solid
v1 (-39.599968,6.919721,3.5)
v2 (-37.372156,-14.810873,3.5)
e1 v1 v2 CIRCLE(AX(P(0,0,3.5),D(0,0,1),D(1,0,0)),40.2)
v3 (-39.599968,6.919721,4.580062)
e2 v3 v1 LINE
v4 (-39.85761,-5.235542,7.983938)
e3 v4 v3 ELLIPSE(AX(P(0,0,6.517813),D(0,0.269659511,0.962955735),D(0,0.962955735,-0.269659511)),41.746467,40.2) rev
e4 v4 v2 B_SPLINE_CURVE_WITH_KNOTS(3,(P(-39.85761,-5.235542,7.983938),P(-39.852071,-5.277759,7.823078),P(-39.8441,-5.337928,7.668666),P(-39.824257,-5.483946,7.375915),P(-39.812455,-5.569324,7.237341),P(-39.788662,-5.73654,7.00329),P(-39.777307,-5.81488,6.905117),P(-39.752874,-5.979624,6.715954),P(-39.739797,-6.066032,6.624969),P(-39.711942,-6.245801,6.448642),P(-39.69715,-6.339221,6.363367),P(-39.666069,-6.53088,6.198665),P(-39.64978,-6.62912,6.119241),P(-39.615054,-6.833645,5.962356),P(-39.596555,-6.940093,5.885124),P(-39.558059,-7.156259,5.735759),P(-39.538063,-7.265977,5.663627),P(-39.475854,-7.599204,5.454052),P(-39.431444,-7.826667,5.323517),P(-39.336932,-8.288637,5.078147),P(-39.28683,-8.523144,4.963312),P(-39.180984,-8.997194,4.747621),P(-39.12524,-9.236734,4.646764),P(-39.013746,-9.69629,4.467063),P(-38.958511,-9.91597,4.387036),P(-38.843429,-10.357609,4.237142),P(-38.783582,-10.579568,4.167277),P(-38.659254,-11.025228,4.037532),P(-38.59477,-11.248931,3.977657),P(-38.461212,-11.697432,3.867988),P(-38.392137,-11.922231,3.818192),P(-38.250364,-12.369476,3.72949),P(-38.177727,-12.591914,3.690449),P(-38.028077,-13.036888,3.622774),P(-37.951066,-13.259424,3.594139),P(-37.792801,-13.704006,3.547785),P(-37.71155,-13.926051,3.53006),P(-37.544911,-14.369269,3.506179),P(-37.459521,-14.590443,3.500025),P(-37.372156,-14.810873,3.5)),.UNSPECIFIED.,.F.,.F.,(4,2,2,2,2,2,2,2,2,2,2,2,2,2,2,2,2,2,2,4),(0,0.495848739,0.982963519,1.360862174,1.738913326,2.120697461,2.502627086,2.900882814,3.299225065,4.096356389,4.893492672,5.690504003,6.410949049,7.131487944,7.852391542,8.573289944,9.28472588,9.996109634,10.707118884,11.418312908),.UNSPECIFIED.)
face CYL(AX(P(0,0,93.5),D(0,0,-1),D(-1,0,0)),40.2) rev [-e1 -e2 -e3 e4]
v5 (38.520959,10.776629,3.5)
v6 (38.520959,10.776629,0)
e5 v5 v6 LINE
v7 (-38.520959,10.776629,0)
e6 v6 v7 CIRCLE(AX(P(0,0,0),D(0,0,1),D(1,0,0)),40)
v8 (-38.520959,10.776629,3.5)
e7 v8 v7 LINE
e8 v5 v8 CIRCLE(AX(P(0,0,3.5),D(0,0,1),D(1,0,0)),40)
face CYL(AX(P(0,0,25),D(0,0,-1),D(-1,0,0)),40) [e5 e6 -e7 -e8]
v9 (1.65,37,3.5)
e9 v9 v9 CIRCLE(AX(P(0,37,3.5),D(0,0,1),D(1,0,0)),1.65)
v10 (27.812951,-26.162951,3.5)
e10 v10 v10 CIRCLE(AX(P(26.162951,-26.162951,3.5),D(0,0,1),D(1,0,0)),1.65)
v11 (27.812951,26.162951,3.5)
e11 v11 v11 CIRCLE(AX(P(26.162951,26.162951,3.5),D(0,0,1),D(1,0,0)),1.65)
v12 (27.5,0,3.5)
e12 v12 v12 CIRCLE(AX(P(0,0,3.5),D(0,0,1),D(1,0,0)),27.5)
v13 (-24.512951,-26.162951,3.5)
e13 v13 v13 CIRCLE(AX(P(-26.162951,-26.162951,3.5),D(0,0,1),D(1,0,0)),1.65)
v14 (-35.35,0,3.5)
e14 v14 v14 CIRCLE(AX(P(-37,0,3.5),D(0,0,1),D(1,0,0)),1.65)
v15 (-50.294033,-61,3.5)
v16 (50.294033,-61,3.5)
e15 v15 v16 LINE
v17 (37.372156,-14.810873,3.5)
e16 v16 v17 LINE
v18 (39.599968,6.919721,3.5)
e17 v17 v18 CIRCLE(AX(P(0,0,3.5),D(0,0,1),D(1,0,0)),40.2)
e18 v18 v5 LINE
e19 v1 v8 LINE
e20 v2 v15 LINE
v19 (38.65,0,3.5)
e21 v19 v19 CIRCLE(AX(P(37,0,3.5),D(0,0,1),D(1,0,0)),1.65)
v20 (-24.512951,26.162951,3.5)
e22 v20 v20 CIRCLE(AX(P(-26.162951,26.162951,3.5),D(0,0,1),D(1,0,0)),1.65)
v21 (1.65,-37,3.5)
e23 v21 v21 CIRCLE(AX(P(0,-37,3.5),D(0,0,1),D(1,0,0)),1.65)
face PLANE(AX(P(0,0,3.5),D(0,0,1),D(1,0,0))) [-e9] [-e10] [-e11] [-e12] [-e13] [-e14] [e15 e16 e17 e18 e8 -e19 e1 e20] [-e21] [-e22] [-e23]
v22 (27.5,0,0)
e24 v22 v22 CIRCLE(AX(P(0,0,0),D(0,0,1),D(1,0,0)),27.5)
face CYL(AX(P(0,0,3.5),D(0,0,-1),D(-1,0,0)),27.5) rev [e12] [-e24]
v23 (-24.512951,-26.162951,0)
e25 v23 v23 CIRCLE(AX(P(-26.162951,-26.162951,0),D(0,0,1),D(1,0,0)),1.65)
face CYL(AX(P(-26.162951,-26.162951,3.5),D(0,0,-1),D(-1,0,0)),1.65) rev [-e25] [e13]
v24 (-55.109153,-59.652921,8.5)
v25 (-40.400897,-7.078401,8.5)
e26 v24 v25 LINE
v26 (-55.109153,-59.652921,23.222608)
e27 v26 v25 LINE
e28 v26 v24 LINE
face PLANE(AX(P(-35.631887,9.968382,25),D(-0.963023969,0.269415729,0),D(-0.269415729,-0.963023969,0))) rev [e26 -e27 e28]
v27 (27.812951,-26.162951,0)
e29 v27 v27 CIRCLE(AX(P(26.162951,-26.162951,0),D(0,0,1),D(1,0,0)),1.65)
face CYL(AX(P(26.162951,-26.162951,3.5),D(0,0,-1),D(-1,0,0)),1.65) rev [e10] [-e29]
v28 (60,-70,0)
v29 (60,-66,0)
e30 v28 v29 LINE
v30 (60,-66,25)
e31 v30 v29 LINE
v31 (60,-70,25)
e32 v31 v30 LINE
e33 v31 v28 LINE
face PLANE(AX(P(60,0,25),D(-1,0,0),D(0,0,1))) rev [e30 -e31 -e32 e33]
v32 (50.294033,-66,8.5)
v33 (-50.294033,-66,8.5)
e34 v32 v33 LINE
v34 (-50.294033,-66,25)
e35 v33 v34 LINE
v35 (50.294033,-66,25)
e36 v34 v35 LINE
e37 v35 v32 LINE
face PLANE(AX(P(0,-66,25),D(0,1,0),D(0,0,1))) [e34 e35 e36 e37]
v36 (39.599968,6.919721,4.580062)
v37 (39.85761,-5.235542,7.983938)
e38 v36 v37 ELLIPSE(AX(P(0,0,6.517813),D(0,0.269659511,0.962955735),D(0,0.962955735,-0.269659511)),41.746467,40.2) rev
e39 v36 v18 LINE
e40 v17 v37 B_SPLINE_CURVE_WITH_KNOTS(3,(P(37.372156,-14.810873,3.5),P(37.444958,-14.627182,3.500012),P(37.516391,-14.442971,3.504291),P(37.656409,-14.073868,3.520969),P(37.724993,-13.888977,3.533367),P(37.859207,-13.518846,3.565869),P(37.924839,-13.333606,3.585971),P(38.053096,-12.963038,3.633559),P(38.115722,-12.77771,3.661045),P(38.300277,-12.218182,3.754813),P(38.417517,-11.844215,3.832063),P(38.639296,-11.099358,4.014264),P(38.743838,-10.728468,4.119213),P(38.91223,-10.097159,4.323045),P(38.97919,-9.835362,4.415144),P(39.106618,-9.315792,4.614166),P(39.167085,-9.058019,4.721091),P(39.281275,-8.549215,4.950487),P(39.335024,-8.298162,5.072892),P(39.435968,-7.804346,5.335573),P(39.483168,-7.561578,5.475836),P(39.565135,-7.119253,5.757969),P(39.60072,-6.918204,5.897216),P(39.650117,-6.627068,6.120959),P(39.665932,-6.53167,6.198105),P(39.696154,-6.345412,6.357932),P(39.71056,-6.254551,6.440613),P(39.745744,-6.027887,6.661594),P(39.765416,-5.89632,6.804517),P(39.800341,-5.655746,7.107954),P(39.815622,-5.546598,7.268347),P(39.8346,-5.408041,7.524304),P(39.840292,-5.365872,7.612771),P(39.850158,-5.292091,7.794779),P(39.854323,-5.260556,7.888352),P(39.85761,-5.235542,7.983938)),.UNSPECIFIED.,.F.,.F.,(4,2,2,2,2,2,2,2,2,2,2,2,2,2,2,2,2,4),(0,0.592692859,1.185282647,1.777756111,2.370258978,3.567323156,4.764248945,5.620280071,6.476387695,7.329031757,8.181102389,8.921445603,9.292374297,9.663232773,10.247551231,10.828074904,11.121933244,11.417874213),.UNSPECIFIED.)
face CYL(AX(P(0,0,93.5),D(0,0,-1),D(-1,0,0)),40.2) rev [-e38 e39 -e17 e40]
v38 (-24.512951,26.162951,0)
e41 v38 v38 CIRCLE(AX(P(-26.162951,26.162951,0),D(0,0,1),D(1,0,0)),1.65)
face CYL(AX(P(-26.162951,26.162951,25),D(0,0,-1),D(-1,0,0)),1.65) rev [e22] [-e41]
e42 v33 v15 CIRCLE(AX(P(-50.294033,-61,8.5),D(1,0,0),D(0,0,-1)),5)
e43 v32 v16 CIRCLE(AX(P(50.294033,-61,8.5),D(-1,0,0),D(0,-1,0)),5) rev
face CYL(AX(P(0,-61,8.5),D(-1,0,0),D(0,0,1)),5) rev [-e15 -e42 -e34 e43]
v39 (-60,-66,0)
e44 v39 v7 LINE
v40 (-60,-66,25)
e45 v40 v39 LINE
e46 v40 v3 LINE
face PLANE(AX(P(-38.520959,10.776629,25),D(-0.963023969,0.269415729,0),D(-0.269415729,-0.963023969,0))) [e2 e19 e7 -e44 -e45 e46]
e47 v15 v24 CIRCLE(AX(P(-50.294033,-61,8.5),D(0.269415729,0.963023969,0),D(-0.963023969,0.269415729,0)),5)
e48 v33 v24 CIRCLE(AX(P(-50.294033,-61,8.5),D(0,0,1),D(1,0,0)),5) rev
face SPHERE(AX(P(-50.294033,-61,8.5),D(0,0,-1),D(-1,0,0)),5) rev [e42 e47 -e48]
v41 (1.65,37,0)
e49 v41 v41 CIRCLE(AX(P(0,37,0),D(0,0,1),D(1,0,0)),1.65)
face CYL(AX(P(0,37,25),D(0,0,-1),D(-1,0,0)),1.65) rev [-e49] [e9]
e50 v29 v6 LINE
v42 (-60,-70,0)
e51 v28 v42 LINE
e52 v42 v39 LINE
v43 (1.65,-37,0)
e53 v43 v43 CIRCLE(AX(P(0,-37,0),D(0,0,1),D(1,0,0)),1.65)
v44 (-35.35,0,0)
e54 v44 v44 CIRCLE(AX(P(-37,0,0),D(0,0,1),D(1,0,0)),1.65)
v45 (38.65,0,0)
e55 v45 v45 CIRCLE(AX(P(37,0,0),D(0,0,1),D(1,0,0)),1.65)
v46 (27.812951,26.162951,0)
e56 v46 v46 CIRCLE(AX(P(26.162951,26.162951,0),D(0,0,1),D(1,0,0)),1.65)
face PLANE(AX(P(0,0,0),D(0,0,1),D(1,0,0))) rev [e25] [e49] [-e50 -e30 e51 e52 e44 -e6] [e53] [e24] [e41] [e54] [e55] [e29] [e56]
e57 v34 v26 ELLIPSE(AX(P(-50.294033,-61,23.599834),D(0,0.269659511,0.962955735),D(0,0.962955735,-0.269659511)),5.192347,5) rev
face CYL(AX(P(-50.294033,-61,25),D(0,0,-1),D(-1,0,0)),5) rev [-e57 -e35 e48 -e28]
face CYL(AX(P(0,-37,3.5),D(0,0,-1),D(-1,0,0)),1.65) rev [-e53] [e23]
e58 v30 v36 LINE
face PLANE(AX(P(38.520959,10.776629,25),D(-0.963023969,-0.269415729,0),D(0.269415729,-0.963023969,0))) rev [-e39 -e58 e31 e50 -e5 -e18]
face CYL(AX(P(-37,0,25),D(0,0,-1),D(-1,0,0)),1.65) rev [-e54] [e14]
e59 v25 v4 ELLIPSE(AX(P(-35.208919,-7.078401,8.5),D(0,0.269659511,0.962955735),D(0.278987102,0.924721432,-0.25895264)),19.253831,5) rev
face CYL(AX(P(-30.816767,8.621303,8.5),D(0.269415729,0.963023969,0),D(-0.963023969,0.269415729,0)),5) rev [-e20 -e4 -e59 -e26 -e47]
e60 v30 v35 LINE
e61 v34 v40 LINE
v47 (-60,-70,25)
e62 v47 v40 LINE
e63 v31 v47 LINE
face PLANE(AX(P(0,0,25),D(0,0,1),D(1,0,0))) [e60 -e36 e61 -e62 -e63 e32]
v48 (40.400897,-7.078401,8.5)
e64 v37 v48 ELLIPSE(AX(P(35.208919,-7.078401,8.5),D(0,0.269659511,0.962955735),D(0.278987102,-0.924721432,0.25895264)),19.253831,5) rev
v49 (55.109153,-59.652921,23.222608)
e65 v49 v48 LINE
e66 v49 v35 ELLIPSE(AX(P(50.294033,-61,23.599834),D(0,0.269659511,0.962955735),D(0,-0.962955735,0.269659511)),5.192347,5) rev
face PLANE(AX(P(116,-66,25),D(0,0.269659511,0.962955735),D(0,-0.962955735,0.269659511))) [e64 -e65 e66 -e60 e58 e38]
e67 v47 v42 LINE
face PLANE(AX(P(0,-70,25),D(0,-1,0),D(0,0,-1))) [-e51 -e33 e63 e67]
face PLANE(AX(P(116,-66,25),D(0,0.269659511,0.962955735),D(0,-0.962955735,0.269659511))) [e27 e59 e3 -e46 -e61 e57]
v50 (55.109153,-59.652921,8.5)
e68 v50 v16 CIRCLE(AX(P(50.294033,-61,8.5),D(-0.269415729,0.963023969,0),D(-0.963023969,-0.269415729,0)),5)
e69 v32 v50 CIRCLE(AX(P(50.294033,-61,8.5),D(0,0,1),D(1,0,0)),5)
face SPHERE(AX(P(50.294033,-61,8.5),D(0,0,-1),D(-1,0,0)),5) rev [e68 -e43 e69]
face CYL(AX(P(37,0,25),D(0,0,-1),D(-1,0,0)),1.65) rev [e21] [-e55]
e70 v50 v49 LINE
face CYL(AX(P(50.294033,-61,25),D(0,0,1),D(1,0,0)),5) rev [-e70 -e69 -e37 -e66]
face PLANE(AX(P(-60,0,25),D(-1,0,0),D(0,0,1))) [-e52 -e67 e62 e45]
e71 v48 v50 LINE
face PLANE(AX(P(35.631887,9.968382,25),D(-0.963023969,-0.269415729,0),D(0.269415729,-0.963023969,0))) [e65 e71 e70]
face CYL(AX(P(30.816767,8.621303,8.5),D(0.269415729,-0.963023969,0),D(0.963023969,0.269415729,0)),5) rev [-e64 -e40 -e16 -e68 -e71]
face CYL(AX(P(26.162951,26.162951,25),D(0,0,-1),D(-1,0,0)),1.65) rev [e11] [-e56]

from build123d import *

# Parameters (mm, degrees)
EXTRUDE_3_DEPTH          = 25
SKETCH_1_5_R             = 1.65
SKETCH_1_5_R_2           = 27.5
EXTRUDE_4_DEPTH          = 3.5
CUT_EXTRUDE_1_DEPTH      = 116
CUT_EXTRUDE_1_DEPTH_BACK = 90
SKETCH_3_R               = 40.2
CUT_EXTRUDE_2_DEPTH      = 90
FILLET_1_R               = 5


with BuildPart() as part:
    # 草图1 → 凸台-拉伸3 (new body)
    with BuildSketch(Plane.XY):
        with BuildLine():
            Line((56.884812739, -66), (60, -66))
            Line((60, -66), (38.520958758, 10.776629174))
            ThreePointArc((38.520958758, 10.776629174), (0, 40), (-38.520958758, 10.776629174))
            Line((-38.520958758, 10.776629174), (-60, -66))
            Line((-60, -66), (-56.884812739, -66))
            Line((-56.884812739, -66), (-38.56602674, -0.519673214))
            ThreePointArc((-38.56602674, -0.519673214), (-38.588989549, 0.444535953), (-38.069024769, 1.256855618))
            Line((-38.069024769, 1.256855618), (-35.631886851, 9.968381986))
            ThreePointArc((-35.631886851, 9.968381986), (-32.349305917, 17.958908839), (-27.303372186, 24.970499941))
            ThreePointArc((-27.303372186, 24.970499941), (-27.329677093, 27.329677093), (-24.970499941, 27.303372186))
            ThreePointArc((-24.970499941, 27.303372186), (-14.159286998, 34.183542703), (-1.649589784, 36.963209459))
            ThreePointArc((-1.649589784, 36.963209459), (-0.018396414, 38.649897443), (1.65, 37))
            ThreePointArc((1.65, 37), (1.649897443, 36.981603586), (1.649589784, 36.963209459))
            ThreePointArc((1.649589784, 36.963209459), (14.159286998, 34.183542703), (24.970499941, 27.303372186))
            ThreePointArc((24.970499941, 27.303372186), (26.77734325, 27.694297385), (27.812950904, 26.162950904))
            ThreePointArc((27.812950904, 26.162950904), (27.680217379, 25.514566417), (27.303372186, 24.970499941))
            ThreePointArc((27.303372186, 24.970499941), (32.349305917, 17.958908839), (35.631886851, 9.968381986))
            Line((35.631886851, 9.968381986), (38.069024769, 1.256855618))
            ThreePointArc((38.069024769, 1.256855618), (38.497730094, 0.692318255), (38.65, 0))
            ThreePointArc((38.65, 0), (38.628871407, -0.263207028), (38.56602674, -0.519673214))
            Line((38.56602674, -0.519673214), (56.884812739, -66))
        make_face()
        Polygon((-60, -70), (-60, -66), (60, -66), (60, -70), (0, -70), align=None)
    extrude(amount=EXTRUDE_3_DEPTH)

    # 草图1<5> → 凸台-拉伸4 (add)
    with BuildSketch(Plane.XY):
        with BuildLine():
            Line((-56.884812739, -66), (56.884812739, -66))
            Line((56.884812739, -66), (38.56602674, -0.519673214))
            ThreePointArc((38.56602674, -0.519673214), (35.411010451, -0.444535953), (38.069024769, 1.256855618))
            Line((38.069024769, 1.256855618), (35.631886851, 9.968381986))
            ThreePointArc((35.631886851, 9.968381986), (32.349305917, 17.958908839), (27.303372186, 24.970499941))
            ThreePointArc((27.303372186, 24.970499941), (24.996224715, 24.996224715), (24.970499941, 27.303372186))
            ThreePointArc((24.970499941, 27.303372186), (14.159286998, 34.183542703), (1.649589784, 36.963209459))
            ThreePointArc((1.649589784, 36.963209459), (0, 35.35), (-1.649589784, 36.963209459))
            ThreePointArc((-1.649589784, 36.963209459), (-14.159286998, 34.183542703), (-24.970499941, 27.303372186))
            ThreePointArc((-24.970499941, 27.303372186), (-24.631604423, 26.77734325), (-24.512950904, 26.162950904))
            ThreePointArc((-24.512950904, 26.162950904), (-25.514566417, 24.645684428), (-27.303372186, 24.970499941))
            ThreePointArc((-27.303372186, 24.970499941), (-32.349305917, 17.958908839), (-35.631886851, 9.968381986))
            Line((-35.631886851, 9.968381986), (-38.069024769, 1.256855618))
            ThreePointArc((-38.069024769, 1.256855618), (-36.307681745, 1.497730094), (-35.35, 0))
            ThreePointArc((-35.35, 0), (-36.736792972, -1.628871407), (-38.56602674, -0.519673214))
            Line((-38.56602674, -0.519673214), (-56.884812739, -66))
        make_face()
        with Locations((0, -37)):
            Circle(SKETCH_1_5_R, mode=Mode.SUBTRACT)
        with Locations((-26.162950904, -26.162950904)):
            Circle(SKETCH_1_5_R, mode=Mode.SUBTRACT)
        with Locations((26.162950904, -26.162950904)):
            Circle(SKETCH_1_5_R, mode=Mode.SUBTRACT)
        Circle(SKETCH_1_5_R_2, mode=Mode.SUBTRACT)
    extrude(amount=EXTRUDE_4_DEPTH)

    # 草图2 → 切除-拉伸1 (cut, two sides: drawn at the far end of the back side and taken through both)
    with BuildSketch(Plane(origin=(0, 0, 0), x_dir=(0, 0, -1), z_dir=(1, 0, 0)).offset(-CUT_EXTRUDE_1_DEPTH_BACK)):
        Polygon((-25, -66), (-3.5, 10.776629174), (-3.5, 62.872025622), (-39.293867153, 54.574713181), (-52.271714816, -41.589010491), align=None)
    extrude(amount=CUT_EXTRUDE_1_DEPTH + CUT_EXTRUDE_1_DEPTH_BACK, mode=Mode.SUBTRACT)

    # 草图3 → 切除-拉伸2 (cut)
    with BuildSketch(Plane.XY.offset(3.5)):
        Circle(SKETCH_3_R)
    extrude(amount=CUT_EXTRUDE_2_DEPTH, mode=Mode.SUBTRACT)

    # 圆角1
    # the kernel refuses this fillet: 5 mm, written as the material it adds along each edge
    with BuildSketch(Plane(origin=(-50.294033224, -61, 8.5), x_dir=(0, -1, 0), z_dir=(0, 0, -1))) as fillet_1_piece_1_section:
        Polygon((0, 0), (FILLET_1_R, 0), (FILLET_1_R, FILLET_1_R * 1.31815590294), (-FILLET_1_R * 0.269415729351, FILLET_1_R * 0.963023968953), align=None)
    fillet_1_piece_1 = extrude(amount=FILLET_1_R, mode=Mode.PRIVATE)
    fillet_1_piece_1 = fillet_1_piece_1 - Plane(origin=(-50.294033224, -61, 8.5), x_dir=(0.7966855494331734, 0.6043940232367977, 0), z_dir=(0, 0, -1)) * Sphere(FILLET_1_R, mode=Mode.PRIVATE)
    add(fillet_1_piece_1)
    with BuildSketch(Plane(origin=(50.294033224, -61, 8.5), x_dir=(0.9630239689530686, 0.26941572935127434, 0), z_dir=(0, 0, -1))) as fillet_1_piece_2_section:
        Polygon((0, 0), (FILLET_1_R, 0), (FILLET_1_R, FILLET_1_R * 1.31815590294), (-FILLET_1_R * 0.269415729351, FILLET_1_R * 0.963023968953), align=None)
    fillet_1_piece_2 = extrude(amount=FILLET_1_R, mode=Mode.PRIVATE)
    fillet_1_piece_2 = fillet_1_piece_2 - Plane(origin=(50.294033224, -61, 8.5), x_dir=(-0.7966855494331732, 0.6043940232367977, 0), z_dir=(0, 0, -1)) * Sphere(FILLET_1_R, mode=Mode.PRIVATE)
    add(fillet_1_piece_2)
    with BuildSketch(Plane(origin=(-56.884812739, -66, 8.5), x_dir=(1, 0, 0), z_dir=(0, 0, 1))) as fillet_1_piece_3_section:
        with BuildLine():
            CenterArc((FILLET_1_R * 1.31815590294, FILLET_1_R), FILLET_1_R, 164.370497689, 105.629502311)
            Line((FILLET_1_R * 0.35513193399, FILLET_1_R * 1.26941572935), (0, 0))
            Line((0, 0), (FILLET_1_R * 1.31815590294, 0))
        make_face()
    fillet_1_piece_3 = extrude(amount=16.5, mode=Mode.PRIVATE)
    fillet_1_piece_3 = split(fillet_1_piece_3, bisect_by=Plane(origin=(-54.909873659, -62.45182584, 24.006393674), z_dir=(0, -0.26965951135538185, -0.9629557351901368)), keep=Keep.TOP, mode=Mode.PRIVATE)
    add(fillet_1_piece_3)
    with BuildSketch(Plane(origin=(56.884812739, -66, 8.5), x_dir=(-0.26941572935127367, 0.963023968953069, 0), z_dir=(0, 0, 1))) as fillet_1_piece_4_section:
        with BuildLine():
            CenterArc((FILLET_1_R * 1.31815590294, FILLET_1_R), FILLET_1_R, 164.370497689, 105.629502311)
            Line((FILLET_1_R * 0.35513193399, FILLET_1_R * 1.26941572935), (0, 0))
            Line((0, 0), (FILLET_1_R * 1.31815590294, 0))
        make_face()
    fillet_1_piece_4 = extrude(amount=16.5, mode=Mode.PRIVATE)
    fillet_1_piece_4 = split(fillet_1_piece_4, bisect_by=Plane(origin=(54.909873659, -62.45182584, 24.006393674), z_dir=(0, -0.26965951135538185, -0.9629557351901368)), keep=Keep.TOP, mode=Mode.PRIVATE)
    add(fillet_1_piece_4)
    with BuildSketch(Plane(origin=(-50.294033224, -66, 3.5), x_dir=(0, 1, 0), z_dir=(1, 0, 0))) as fillet_1_piece_5:
        with BuildLine():
            CenterArc((FILLET_1_R, FILLET_1_R), FILLET_1_R, 180, 90)
            Line((0, FILLET_1_R), (0, 0))
            Line((0, 0), (FILLET_1_R, 0))
        make_face()
    extrude(amount=100.588066449)
    with BuildSketch(Plane(origin=(-36.498733621, 6.86984643, 3.5), x_dir=(0.9630239689530686, -0.26941572935127456, 0), z_dir=(-0.26941572935127456, -0.9630239689530686, 0))) as fillet_1_piece_6_section:
        with BuildLine():
            CenterArc((FILLET_1_R, FILLET_1_R), FILLET_1_R, 180, 90)
            Line((0, FILLET_1_R), (0, 0))
            Line((0, 0), (FILLET_1_R, 0))
        make_face()
    fillet_1_piece_6 = extrude(amount=69.076959586, mode=Mode.PRIVATE)
    fillet_1_piece_6 = fillet_1_piece_6 - Plane(origin=(0, 0, 4.655624457), x_dir=(1, 0, 0), z_dir=(0, 0, -1)) * Cylinder(40.2, 159, mode=Mode.PRIVATE)
    fillet_1_piece_6 = split(fillet_1_piece_6, bisect_by=Plane(origin=(-46.735846126, -30.837467909, 15.153325978), z_dir=(0, -0.26965951135538185, -0.9629557351901368)), keep=Keep.TOP, mode=Mode.PRIVATE)
    add(fillet_1_piece_6)
    with BuildSketch(Plane(origin=(55.109153069, -59.652921353, 3.5), x_dir=(-0.9630239689530686, -0.2694157293512744, 0), z_dir=(-0.26941572935127434, 0.9630239689530686, 0))) as fillet_1_piece_7_section:
        with BuildLine():
            CenterArc((FILLET_1_R, FILLET_1_R), FILLET_1_R, 180, 90)
            Line((0, FILLET_1_R), (0, 0))
            Line((0, 0), (FILLET_1_R, 0))
        make_face()
    fillet_1_piece_7 = extrude(amount=69.076959586, mode=Mode.PRIVATE)
    fillet_1_piece_7 = fillet_1_piece_7 - Plane(origin=(0, 0, 4.655620612), x_dir=(1, 0, 0), z_dir=(0, 0, -1)) * Cylinder(40.2, 159, mode=Mode.PRIVATE)
    fillet_1_piece_7 = split(fillet_1_piece_7, bisect_by=Plane(origin=(46.735848084, -30.837472193, 15.153327178), z_dir=(0, -0.26965951135538185, -0.9629557351901368)), keep=Keep.TOP, mode=Mode.PRIVATE)
    add(fillet_1_piece_7)


solid = part.part
